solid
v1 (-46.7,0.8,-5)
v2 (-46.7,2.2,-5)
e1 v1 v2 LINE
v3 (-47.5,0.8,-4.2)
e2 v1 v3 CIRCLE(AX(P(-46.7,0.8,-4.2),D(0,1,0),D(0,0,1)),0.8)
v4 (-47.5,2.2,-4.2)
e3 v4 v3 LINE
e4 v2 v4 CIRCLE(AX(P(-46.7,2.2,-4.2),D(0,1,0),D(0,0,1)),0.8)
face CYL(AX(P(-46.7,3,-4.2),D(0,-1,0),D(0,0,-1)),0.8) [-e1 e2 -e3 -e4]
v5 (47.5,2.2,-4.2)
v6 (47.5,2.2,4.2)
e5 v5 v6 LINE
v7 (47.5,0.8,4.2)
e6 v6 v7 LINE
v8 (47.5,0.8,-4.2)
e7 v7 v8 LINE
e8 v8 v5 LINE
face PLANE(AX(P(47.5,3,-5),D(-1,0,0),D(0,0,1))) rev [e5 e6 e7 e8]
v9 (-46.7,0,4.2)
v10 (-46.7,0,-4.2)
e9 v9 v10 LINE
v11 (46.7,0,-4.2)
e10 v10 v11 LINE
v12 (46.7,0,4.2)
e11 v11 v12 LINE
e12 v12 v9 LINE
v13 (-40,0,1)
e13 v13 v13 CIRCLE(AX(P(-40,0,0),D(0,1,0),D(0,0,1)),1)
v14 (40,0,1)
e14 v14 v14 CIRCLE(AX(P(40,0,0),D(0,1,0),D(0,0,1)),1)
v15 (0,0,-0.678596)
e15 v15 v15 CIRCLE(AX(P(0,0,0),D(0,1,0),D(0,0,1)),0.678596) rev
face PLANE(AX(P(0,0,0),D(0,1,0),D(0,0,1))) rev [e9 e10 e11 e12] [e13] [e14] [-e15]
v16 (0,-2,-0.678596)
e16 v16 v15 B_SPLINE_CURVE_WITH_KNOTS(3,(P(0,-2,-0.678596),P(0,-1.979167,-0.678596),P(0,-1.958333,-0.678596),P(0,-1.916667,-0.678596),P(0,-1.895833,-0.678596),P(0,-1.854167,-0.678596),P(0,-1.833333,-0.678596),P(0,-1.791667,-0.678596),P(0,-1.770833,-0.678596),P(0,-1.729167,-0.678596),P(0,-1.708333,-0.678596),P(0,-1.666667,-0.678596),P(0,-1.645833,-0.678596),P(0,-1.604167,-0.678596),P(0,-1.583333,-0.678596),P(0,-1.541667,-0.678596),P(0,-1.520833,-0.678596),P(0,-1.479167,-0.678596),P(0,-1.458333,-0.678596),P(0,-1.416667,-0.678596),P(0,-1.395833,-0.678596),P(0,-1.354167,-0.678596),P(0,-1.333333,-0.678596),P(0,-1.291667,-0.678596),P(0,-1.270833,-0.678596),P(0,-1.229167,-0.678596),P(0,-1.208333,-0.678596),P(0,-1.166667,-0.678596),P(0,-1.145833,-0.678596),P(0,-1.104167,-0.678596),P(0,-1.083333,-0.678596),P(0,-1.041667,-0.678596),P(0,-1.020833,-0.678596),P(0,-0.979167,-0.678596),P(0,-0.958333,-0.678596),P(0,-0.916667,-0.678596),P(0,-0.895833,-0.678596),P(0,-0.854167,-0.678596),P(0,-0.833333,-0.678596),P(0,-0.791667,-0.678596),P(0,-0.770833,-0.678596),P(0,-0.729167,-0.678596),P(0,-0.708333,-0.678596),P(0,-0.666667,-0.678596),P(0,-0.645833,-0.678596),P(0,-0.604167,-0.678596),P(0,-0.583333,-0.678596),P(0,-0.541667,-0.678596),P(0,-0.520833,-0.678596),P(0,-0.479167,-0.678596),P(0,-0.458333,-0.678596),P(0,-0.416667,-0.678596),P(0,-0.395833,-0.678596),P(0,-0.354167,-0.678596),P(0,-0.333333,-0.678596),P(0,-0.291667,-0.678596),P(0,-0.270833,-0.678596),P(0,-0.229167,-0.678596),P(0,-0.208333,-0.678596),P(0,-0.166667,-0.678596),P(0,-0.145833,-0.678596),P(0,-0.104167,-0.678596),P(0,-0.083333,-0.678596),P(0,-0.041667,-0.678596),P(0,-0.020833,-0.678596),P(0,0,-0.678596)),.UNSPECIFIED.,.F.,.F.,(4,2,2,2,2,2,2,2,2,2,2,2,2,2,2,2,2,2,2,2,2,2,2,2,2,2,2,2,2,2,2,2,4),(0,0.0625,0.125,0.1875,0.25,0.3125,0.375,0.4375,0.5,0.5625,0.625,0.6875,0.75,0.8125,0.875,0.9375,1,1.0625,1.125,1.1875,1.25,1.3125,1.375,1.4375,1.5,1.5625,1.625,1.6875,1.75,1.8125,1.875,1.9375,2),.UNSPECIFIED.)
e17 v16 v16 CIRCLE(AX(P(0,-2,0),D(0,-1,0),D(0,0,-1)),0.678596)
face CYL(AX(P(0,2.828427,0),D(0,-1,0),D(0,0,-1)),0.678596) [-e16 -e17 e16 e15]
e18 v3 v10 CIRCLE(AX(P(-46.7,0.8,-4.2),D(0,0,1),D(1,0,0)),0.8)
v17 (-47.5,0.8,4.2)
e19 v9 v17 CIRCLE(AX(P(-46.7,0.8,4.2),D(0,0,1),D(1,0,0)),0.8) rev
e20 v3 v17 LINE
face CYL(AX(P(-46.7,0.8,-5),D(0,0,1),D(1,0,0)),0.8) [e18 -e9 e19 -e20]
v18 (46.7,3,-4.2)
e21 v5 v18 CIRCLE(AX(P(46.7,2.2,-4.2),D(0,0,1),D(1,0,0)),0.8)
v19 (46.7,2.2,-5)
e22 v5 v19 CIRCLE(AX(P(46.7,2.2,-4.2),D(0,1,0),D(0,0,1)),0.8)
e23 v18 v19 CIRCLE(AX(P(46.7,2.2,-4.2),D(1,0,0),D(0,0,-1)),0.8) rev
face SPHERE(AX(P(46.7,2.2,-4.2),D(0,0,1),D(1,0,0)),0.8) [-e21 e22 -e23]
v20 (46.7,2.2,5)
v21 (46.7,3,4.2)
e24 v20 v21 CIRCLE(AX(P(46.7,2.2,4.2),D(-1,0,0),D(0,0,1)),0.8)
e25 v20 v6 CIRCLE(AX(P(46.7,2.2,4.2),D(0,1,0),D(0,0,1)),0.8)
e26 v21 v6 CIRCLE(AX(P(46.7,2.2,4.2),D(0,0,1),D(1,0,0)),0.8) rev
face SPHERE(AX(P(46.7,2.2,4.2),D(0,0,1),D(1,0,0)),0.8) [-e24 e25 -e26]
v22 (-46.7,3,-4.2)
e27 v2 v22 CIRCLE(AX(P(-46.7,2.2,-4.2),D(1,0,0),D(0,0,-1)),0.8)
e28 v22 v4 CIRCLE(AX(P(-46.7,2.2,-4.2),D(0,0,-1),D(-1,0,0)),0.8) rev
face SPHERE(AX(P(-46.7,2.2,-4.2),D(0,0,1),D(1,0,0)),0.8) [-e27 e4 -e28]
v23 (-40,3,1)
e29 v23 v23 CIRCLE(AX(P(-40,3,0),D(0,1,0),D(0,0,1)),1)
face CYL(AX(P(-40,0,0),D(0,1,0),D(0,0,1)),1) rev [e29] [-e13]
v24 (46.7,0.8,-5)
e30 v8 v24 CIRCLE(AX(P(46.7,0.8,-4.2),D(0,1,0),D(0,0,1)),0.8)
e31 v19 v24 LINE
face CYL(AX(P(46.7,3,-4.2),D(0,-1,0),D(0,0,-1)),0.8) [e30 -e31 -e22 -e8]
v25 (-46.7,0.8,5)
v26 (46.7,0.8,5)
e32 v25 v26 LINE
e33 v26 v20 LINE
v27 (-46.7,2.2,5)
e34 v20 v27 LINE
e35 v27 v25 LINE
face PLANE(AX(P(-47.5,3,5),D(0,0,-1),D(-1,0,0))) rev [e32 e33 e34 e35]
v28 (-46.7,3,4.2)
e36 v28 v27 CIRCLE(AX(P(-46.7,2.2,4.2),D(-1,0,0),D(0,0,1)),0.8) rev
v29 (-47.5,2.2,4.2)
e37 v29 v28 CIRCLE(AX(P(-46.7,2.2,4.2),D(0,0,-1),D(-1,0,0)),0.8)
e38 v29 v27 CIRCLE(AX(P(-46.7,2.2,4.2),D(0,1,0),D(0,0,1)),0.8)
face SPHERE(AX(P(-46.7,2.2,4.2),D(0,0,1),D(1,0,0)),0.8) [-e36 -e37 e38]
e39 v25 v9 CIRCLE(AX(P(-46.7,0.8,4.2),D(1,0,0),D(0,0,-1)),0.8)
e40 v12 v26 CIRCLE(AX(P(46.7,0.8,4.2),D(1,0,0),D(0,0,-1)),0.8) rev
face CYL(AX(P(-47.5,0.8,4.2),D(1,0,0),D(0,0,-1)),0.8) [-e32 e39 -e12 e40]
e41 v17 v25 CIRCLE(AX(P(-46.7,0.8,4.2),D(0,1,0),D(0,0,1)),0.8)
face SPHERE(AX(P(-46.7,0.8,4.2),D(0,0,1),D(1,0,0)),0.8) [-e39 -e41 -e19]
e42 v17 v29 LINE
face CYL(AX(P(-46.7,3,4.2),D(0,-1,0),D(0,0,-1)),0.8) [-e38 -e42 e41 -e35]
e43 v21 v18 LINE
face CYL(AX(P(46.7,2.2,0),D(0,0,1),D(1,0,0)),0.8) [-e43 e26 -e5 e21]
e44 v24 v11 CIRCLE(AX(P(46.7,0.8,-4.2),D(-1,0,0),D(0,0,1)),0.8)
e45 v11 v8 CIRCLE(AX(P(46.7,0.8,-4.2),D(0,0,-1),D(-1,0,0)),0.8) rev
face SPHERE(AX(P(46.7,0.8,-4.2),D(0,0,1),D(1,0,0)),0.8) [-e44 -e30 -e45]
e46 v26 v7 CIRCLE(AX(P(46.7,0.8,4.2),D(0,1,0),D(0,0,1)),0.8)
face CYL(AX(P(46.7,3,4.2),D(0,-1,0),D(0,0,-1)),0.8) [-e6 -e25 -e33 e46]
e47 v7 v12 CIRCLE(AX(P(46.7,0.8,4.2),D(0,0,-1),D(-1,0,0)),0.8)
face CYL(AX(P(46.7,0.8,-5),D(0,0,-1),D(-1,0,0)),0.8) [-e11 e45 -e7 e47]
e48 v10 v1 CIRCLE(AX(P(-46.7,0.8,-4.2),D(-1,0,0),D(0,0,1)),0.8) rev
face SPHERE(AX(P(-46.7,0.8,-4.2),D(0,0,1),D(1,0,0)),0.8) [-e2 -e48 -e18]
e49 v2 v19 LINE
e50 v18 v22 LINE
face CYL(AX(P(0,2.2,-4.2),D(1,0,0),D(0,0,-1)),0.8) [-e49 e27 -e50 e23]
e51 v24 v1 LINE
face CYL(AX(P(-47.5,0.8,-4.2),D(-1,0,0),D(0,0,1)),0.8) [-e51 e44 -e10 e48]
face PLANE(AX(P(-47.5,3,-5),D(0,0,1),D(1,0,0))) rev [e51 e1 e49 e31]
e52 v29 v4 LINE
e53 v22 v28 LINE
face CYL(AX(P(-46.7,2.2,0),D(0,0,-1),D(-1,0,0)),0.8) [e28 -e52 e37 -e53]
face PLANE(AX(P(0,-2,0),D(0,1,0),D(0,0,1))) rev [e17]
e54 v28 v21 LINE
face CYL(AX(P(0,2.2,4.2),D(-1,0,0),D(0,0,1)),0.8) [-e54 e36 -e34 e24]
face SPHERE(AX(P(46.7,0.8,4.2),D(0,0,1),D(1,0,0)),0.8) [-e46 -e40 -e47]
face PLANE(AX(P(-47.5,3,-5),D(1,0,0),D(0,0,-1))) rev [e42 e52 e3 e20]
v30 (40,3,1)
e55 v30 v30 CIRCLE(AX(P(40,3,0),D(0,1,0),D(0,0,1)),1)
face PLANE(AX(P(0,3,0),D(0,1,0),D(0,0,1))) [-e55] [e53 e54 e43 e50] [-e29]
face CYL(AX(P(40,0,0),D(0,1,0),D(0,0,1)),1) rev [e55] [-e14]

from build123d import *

# Parameters (mm, degrees)
SKETCH1_W           = 95
SKETCH1_H           = 10
BOSS_EXTRUDE1_DEPTH = 3
FILLET1_R           = 0.8
FILLET2_R           = 0.8
SKETCH2_R           = 1
CUT_EXTRUDE1_DEPTH  = 48.8565565
SKETCH3_R           = 1
BOSS_EXTRUDE2_DEPTH = 5
CUT_EXTRUDE3_START  = -2
SKETCH4_R           = 1
SKETCH4_R_2         = 0.678596162
CUT_EXTRUDE3_DEPTH  = 2


with BuildPart() as part:
    # Sketch1 → Boss-Extrude1 (new body)
    with BuildSketch(Plane(origin=(0, 0, 0), x_dir=(1, 0, 0), z_dir=(0, 1, 0))):
        Rectangle(SKETCH1_W, SKETCH1_H)
    extrude(amount=BOSS_EXTRUDE1_DEPTH)

    # Fillet1
    fillet1_edges = [part.edges().sort_by_distance(p)[0] for p in [
        (-47.5, 3, 0),
        (0, 3, 5),
        (47.5, 3, 0),
        (0, 0, 5),
        (-47.5, 0, 0),
        (0, 0, -5),
        (47.5, 0, 0),
        (0, 3, -5),
    ]]
    fillet(fillet1_edges, radius=FILLET1_R)

    # Fillet2
    # the kernel refuses this fillet: 0.8 mm, written as the material it takes off along each edge
    with BuildSketch(Plane(origin=(46.7, 0.8, 4.2), x_dir=(0, 0, 1), z_dir=(1, 0, 0))) as fillet2_piece_1_section:
        Polygon((0, 0), (FILLET2_R, 0), (FILLET2_R, FILLET2_R), (0, FILLET2_R), align=None)
    fillet2_piece_1 = extrude(amount=FILLET2_R, mode=Mode.PRIVATE)
    fillet2_piece_1 = fillet2_piece_1 - Plane(origin=(46.7, 0.8, 4.2), x_dir=(0, 0.7071067811865475, -0.7071067811865475), z_dir=(1, 0, 0)) * Sphere(FILLET2_R, mode=Mode.PRIVATE)
    add(fillet2_piece_1, mode=Mode.SUBTRACT)
    with BuildSketch(Plane(origin=(-46.7, 0.8, 4.2), x_dir=(0, 0, 1), z_dir=(-1, 0, 0))) as fillet2_piece_2_section:
        Polygon((0, 0), (FILLET2_R, 0), (FILLET2_R, -FILLET2_R), (0, -FILLET2_R), align=None)
    fillet2_piece_2 = extrude(amount=FILLET2_R, mode=Mode.PRIVATE)
    fillet2_piece_2 = fillet2_piece_2 - Plane(origin=(-46.7, 0.8, 4.2), x_dir=(0, 0.7071067811865475, -0.7071067811865475), z_dir=(-1, 0, 0)) * Sphere(FILLET2_R, mode=Mode.PRIVATE)
    add(fillet2_piece_2, mode=Mode.SUBTRACT)
    with BuildSketch(Plane(origin=(46.7, 0.8, -4.2), x_dir=(1, 0, 0), z_dir=(0, 0, -1))) as fillet2_piece_3_section:
        Polygon((0, 0), (FILLET2_R, 0), (FILLET2_R, FILLET2_R), (0, FILLET2_R), align=None)
    fillet2_piece_3 = extrude(amount=FILLET2_R, mode=Mode.PRIVATE)
    fillet2_piece_3 = fillet2_piece_3 - Plane(origin=(46.7, 0.8, -4.2), x_dir=(-0.7071067811865475, 0.7071067811865475, 0), z_dir=(0, 0, -1)) * Sphere(FILLET2_R, mode=Mode.PRIVATE)
    add(fillet2_piece_3, mode=Mode.SUBTRACT)
    with BuildSketch(Plane(origin=(-46.7, 0.8, -4.2), x_dir=(-1, 0, 0), z_dir=(0, 0, -1))) as fillet2_piece_4_section:
        Polygon((0, 0), (FILLET2_R, 0), (FILLET2_R, -FILLET2_R), (0, -FILLET2_R), align=None)
    fillet2_piece_4 = extrude(amount=FILLET2_R, mode=Mode.PRIVATE)
    fillet2_piece_4 = fillet2_piece_4 - Plane(origin=(-46.7, 0.8, -4.2), x_dir=(0.7071067811865475, 0.7071067811865475, 0), z_dir=(0, 0, -1)) * Sphere(FILLET2_R, mode=Mode.PRIVATE)
    add(fillet2_piece_4, mode=Mode.SUBTRACT)
    with BuildSketch(Plane(origin=(-46.7, 2.2, -4.2), x_dir=(-1, 0, 0), z_dir=(0, 0, -1))) as fillet2_piece_5_section:
        Polygon((0, 0), (FILLET2_R, 0), (FILLET2_R, FILLET2_R), (0, FILLET2_R), align=None)
    fillet2_piece_5 = extrude(amount=FILLET2_R, mode=Mode.PRIVATE)
    fillet2_piece_5 = fillet2_piece_5 - Plane(origin=(-46.7, 2.2, -4.2), x_dir=(0.7071067811865475, -0.7071067811865475, 0), z_dir=(0, 0, -1)) * Sphere(FILLET2_R, mode=Mode.PRIVATE)
    add(fillet2_piece_5, mode=Mode.SUBTRACT)
    with BuildSketch(Plane(origin=(46.7, 2.2, -4.2), x_dir=(1, 0, 0), z_dir=(0, 0, -1))) as fillet2_piece_6_section:
        Polygon((0, 0), (FILLET2_R, 0), (FILLET2_R, -FILLET2_R), (0, -FILLET2_R), align=None)
    fillet2_piece_6 = extrude(amount=FILLET2_R, mode=Mode.PRIVATE)
    fillet2_piece_6 = fillet2_piece_6 - Plane(origin=(46.7, 2.2, -4.2), x_dir=(-0.7071067811865475, -0.7071067811865475, 0), z_dir=(0, 0, -1)) * Sphere(FILLET2_R, mode=Mode.PRIVATE)
    add(fillet2_piece_6, mode=Mode.SUBTRACT)
    with BuildSketch(Plane(origin=(-46.7, 2.2, 4.2), x_dir=(0, 0, 1), z_dir=(-1, 0, 0))) as fillet2_piece_7_section:
        Polygon((0, 0), (FILLET2_R, 0), (FILLET2_R, FILLET2_R), (0, FILLET2_R), align=None)
    fillet2_piece_7 = extrude(amount=FILLET2_R, mode=Mode.PRIVATE)
    fillet2_piece_7 = fillet2_piece_7 - Plane(origin=(-46.7, 2.2, 4.2), x_dir=(0, -0.7071067811865475, -0.7071067811865475), z_dir=(-1, 0, 0)) * Sphere(FILLET2_R, mode=Mode.PRIVATE)
    add(fillet2_piece_7, mode=Mode.SUBTRACT)
    with BuildSketch(Plane(origin=(46.7, 2.2, 4.2), x_dir=(0, 0, 1), z_dir=(1, 0, 0))) as fillet2_piece_8_section:
        Polygon((0, 0), (FILLET2_R, 0), (FILLET2_R, -FILLET2_R), (0, -FILLET2_R), align=None)
    fillet2_piece_8 = extrude(amount=FILLET2_R, mode=Mode.PRIVATE)
    fillet2_piece_8 = fillet2_piece_8 - Plane(origin=(46.7, 2.2, 4.2), x_dir=(0, -0.7071067811865475, -0.7071067811865475), z_dir=(1, 0, 0)) * Sphere(FILLET2_R, mode=Mode.PRIVATE)
    add(fillet2_piece_8, mode=Mode.SUBTRACT)
    with BuildSketch(Plane(origin=(-47.5, 0.8, -5), x_dir=(1, 0, 0), z_dir=(0, 1, 0)), Plane(origin=(-47.5, 0.8, 5), x_dir=(0, 0, -1), z_dir=(0, 1, 0))) as fillet2_piece_9:
        with BuildLine():
            CenterArc((FILLET2_R, -FILLET2_R), FILLET2_R, 90, 90)
            Line((0, -FILLET2_R), (0, 0))
            Line((0, 0), (FILLET2_R, 0))
        make_face()
    extrude(amount=1.4, mode=Mode.SUBTRACT)
    with BuildSketch(Plane(origin=(47.5, 0.8, -5), x_dir=(-1, 0, 0), z_dir=(0, 1, 0)), Plane(origin=(47.5, 0.8, 5), x_dir=(0, 0, -1), z_dir=(0, 1, 0))) as fillet2_piece_10:
        with BuildLine():
            CenterArc((FILLET2_R, FILLET2_R), FILLET2_R, 180, 90)
            Line((0, FILLET2_R), (0, 0))
            Line((0, 0), (FILLET2_R, 0))
        make_face()
    extrude(amount=1.4, mode=Mode.SUBTRACT)

    # Sketch2 → Cut-Extrude1 (cut, through all)
    with BuildSketch(Plane(origin=(0, 3, 0), x_dir=(1, 0, 0), z_dir=(0, 1, 0))):
        with Locations(Location((0, 0, 0), (0, 0, 270))):
            Circle(SKETCH2_R)
        with Locations(Location((-40, 0, 0), (0, 0, 270))):
            Circle(SKETCH2_R)
        with Locations(Location((40, 0, 0), (0, 0, 270))):
            Circle(SKETCH2_R)
    extrude(amount=-CUT_EXTRUDE1_DEPTH, mode=Mode.SUBTRACT)

    # Sketch3 → Boss-Extrude2 (add)
    with BuildSketch(Plane(origin=(0, 3, 0), x_dir=(1, 0, 0), z_dir=(0, 1, 0))):
        with Locations(Location((0, 0, 0), (0, 0, 270))):
            Circle(SKETCH3_R)
    extrude(amount=-BOSS_EXTRUDE2_DEPTH)

    # Sketch4 → Cut-Extrude3 (cut)
    with BuildSketch(Plane.XZ.offset(2).offset(CUT_EXTRUDE3_START)):
        Circle(SKETCH4_R)
        with Locations(Location((0, 0, 0), (0, 0, 270))):
            Circle(SKETCH4_R_2, mode=Mode.SUBTRACT)
    extrude(amount=CUT_EXTRUDE3_DEPTH, mode=Mode.SUBTRACT)


solid = part.part
